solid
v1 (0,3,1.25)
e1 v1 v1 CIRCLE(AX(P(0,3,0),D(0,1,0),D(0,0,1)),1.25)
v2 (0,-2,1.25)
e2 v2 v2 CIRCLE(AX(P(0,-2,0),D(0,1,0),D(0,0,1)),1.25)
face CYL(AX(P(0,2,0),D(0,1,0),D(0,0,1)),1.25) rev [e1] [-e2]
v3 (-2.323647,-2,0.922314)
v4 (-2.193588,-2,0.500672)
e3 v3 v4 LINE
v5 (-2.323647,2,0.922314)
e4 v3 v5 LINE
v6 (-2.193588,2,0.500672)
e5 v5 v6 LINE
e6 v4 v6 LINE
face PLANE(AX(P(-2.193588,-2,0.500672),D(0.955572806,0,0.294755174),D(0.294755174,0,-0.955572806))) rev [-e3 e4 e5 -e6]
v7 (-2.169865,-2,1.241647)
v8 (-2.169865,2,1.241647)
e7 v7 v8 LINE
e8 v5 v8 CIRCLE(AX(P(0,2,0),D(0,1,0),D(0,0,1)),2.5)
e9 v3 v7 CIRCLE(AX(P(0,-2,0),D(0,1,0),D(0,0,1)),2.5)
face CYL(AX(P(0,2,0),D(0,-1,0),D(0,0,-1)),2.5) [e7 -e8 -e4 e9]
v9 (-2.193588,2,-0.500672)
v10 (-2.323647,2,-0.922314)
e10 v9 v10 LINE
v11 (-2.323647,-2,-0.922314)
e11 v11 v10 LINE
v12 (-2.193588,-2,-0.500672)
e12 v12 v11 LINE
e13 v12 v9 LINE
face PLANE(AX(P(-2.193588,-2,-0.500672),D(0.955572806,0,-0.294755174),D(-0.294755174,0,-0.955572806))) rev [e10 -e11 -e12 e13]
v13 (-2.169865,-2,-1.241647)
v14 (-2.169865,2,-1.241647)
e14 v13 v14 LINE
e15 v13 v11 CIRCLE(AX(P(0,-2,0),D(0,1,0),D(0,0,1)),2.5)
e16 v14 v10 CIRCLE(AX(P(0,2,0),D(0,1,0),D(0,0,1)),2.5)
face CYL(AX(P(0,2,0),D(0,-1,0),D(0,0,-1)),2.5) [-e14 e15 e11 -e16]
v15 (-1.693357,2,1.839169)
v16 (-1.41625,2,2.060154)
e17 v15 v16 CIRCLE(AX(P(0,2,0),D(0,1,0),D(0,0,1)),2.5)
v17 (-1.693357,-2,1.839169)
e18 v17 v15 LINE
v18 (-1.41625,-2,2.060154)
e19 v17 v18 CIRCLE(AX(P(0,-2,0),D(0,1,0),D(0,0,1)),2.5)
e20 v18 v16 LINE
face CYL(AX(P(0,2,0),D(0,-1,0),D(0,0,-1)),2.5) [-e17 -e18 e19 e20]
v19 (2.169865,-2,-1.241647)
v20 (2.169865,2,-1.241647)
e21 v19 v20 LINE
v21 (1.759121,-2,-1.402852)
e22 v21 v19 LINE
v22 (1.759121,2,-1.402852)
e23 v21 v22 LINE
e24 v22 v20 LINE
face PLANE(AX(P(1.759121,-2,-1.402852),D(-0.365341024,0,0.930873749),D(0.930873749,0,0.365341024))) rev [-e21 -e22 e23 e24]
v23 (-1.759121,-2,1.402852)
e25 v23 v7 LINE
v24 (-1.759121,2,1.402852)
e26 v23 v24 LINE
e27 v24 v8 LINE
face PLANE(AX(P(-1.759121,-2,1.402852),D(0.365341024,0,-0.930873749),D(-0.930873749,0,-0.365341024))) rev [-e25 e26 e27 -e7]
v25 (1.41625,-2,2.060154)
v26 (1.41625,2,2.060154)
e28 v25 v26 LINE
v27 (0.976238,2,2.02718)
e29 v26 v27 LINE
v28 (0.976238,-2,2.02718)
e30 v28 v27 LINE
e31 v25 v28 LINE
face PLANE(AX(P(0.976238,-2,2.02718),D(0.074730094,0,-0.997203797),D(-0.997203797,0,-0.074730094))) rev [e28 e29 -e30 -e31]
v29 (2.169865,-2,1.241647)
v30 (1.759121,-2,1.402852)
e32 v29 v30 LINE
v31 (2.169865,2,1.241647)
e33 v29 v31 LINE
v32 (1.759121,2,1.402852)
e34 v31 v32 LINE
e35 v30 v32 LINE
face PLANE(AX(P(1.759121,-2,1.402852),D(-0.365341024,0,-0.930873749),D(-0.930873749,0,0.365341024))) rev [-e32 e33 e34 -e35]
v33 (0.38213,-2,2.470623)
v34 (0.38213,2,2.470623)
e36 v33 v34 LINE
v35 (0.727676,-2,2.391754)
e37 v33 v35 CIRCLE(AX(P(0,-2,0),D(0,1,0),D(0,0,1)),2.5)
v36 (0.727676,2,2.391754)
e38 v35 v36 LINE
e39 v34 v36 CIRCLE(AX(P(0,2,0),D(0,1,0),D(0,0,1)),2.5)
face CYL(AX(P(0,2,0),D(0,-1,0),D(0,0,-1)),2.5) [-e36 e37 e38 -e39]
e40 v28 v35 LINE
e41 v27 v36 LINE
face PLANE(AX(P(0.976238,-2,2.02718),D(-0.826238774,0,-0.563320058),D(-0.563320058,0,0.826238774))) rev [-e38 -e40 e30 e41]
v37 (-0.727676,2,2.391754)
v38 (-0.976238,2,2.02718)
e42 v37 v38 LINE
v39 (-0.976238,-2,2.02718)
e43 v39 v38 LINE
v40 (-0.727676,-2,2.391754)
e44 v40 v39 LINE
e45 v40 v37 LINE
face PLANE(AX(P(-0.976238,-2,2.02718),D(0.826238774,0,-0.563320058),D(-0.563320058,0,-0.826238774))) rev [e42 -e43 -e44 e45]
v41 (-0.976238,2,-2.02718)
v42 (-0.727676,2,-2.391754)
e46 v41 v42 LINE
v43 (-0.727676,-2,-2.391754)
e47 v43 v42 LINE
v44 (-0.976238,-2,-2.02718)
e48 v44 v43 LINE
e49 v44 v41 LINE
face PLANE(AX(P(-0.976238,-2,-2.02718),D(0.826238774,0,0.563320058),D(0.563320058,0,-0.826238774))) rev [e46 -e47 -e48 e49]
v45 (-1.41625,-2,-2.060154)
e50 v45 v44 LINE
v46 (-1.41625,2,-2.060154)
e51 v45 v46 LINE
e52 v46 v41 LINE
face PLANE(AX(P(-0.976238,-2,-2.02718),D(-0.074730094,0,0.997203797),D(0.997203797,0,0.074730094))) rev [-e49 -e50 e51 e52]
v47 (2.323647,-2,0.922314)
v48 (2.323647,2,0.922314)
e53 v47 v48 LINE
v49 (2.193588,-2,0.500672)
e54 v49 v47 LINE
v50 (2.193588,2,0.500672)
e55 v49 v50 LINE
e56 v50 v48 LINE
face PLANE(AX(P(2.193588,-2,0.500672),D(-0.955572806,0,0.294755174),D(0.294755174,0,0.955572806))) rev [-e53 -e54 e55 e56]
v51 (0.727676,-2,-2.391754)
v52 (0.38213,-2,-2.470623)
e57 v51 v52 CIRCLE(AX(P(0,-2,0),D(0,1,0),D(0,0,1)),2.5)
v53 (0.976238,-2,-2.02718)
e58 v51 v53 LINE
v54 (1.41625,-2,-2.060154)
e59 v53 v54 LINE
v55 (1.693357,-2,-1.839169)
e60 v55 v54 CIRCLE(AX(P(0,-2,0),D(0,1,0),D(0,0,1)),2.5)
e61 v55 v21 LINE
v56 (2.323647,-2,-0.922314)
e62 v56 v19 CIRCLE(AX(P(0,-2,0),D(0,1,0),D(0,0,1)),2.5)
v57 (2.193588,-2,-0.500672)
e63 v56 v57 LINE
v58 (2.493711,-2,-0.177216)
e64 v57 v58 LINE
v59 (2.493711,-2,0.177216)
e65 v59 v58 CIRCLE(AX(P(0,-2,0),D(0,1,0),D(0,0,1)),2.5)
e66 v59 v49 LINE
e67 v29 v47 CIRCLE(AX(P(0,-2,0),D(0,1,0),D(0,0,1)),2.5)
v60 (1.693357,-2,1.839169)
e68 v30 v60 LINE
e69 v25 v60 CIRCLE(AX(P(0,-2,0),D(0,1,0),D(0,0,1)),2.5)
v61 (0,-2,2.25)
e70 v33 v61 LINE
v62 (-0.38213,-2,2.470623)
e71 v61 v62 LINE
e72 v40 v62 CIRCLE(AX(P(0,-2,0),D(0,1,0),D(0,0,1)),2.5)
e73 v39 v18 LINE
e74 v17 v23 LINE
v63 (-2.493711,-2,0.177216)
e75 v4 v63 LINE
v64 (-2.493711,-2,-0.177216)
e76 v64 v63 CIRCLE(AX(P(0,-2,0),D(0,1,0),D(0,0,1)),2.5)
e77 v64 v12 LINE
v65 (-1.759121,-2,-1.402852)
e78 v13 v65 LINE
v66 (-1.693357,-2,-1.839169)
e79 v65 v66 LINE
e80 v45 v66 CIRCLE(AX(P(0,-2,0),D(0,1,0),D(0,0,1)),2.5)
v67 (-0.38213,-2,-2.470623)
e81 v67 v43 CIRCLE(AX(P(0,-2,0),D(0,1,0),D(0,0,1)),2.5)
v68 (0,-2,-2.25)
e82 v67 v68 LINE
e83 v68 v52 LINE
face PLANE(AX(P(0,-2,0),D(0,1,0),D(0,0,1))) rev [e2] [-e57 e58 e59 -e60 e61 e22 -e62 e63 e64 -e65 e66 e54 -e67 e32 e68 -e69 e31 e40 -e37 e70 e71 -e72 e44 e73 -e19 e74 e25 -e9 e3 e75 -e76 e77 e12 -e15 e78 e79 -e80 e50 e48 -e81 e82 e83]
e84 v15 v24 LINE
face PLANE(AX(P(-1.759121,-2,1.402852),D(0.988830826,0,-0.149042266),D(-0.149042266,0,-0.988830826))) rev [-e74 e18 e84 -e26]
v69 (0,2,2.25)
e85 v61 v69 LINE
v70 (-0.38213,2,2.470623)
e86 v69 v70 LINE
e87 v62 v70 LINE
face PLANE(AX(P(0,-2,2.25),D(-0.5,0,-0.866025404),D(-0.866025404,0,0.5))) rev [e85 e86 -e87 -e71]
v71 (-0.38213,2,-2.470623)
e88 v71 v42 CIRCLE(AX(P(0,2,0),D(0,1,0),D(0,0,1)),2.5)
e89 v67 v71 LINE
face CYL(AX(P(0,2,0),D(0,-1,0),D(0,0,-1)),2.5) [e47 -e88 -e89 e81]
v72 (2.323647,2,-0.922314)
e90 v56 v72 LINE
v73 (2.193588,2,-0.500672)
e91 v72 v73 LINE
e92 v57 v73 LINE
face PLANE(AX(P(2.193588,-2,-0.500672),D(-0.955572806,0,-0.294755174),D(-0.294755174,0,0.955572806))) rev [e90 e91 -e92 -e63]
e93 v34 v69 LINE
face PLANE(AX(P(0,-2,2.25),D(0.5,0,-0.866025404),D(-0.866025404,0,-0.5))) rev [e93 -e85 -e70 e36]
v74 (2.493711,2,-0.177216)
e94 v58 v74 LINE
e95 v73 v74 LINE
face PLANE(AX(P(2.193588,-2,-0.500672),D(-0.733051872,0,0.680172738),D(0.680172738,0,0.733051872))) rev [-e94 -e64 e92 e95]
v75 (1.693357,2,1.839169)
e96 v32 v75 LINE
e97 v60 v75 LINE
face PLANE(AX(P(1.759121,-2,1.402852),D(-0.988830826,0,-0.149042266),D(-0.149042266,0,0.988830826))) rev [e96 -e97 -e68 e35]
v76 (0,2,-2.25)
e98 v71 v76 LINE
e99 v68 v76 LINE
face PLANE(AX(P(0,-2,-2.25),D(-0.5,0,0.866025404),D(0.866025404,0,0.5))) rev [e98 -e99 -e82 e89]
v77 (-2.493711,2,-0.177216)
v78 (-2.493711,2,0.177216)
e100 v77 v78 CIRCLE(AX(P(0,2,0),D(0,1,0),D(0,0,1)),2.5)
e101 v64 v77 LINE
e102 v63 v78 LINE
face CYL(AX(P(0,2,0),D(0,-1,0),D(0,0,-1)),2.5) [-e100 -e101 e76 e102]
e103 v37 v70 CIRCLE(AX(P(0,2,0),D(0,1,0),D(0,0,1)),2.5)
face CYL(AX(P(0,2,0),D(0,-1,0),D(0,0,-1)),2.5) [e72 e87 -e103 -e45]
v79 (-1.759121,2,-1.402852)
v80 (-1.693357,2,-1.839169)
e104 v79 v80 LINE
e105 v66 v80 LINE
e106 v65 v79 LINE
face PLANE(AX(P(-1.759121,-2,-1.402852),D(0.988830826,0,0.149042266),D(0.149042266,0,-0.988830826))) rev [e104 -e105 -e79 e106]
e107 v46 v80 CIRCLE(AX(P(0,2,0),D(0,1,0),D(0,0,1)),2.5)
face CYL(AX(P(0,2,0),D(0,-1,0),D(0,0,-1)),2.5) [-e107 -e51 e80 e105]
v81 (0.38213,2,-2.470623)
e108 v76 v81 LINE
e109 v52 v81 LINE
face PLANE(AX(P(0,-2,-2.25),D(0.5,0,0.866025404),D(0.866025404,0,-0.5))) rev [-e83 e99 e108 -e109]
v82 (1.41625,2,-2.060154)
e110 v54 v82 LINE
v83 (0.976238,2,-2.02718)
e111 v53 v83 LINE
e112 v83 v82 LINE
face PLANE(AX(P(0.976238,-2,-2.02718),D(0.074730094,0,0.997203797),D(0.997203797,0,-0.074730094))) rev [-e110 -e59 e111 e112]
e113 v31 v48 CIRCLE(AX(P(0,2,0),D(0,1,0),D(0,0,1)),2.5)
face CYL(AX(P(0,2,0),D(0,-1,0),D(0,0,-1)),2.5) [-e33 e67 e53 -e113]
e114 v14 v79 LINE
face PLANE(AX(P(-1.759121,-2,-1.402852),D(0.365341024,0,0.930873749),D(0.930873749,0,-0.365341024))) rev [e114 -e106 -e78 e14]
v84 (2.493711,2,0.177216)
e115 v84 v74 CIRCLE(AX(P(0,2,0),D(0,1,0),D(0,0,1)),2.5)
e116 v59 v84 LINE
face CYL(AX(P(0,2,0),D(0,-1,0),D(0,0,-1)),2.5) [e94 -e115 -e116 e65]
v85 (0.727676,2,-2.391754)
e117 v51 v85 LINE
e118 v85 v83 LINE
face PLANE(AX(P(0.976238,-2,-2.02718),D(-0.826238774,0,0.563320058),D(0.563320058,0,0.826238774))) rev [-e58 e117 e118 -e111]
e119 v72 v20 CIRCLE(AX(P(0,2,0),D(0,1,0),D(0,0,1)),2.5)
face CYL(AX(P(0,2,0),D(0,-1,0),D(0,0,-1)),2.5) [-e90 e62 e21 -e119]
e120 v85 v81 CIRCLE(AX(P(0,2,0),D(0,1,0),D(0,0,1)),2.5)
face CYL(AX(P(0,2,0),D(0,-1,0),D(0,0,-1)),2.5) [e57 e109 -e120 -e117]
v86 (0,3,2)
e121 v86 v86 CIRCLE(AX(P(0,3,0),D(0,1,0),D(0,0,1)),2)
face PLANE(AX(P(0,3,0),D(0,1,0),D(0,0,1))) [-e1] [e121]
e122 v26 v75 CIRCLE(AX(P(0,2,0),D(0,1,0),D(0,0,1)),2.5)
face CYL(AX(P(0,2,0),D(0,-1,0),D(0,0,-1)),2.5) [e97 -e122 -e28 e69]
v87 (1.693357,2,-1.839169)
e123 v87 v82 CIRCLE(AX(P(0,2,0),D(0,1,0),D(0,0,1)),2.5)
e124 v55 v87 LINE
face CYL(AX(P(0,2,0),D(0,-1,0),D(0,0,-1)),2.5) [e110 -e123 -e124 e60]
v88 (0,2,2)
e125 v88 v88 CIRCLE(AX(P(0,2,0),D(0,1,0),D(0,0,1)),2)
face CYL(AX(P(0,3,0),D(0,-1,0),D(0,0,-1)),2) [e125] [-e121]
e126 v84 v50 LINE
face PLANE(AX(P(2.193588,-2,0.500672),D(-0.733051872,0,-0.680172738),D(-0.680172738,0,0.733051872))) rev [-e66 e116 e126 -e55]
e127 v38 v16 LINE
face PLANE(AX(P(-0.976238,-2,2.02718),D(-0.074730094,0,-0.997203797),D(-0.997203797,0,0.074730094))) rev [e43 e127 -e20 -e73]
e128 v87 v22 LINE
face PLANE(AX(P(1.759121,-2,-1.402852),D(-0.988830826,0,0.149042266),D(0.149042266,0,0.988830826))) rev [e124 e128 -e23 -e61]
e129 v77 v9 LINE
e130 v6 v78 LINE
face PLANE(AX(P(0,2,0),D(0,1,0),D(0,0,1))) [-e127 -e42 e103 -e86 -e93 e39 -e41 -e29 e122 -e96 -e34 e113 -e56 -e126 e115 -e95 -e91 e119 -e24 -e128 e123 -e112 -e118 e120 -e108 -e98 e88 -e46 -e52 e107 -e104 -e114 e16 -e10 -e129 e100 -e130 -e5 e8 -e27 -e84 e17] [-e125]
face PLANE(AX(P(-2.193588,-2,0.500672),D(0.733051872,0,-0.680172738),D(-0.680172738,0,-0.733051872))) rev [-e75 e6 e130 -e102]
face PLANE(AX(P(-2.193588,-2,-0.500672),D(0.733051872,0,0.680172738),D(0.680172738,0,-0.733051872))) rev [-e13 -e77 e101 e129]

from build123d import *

# Parameters (mm, degrees)
MAINBODYS_R           = 2.5
MAIN_BODY_DEPTH       = 2
M3X0_5_TAPPED_HOLE1_D = 2.5
GROOVED_CUT_DEPTH     = 6.338539126
GC_START              = -2
GC_CP_DEPTH           = 4
PRESSFITBODYS_R       = 2
PRESSFITBODYS_R_2     = 1.25
PRESS_FIT_BODY_DEPTH  = 1


# Read off the part's stored shape, not the designer's step: GC CP
with BuildPart() as part:
    # MainBodyS → MAIN BODY (new, symmetric)
    with BuildSketch(Plane(origin=(0, 0, 0), x_dir=(1, 0, 0), z_dir=(0, 1, 0))):
        with Locations(Location((0, 0, 0), (0, 0, 270))):
            Circle(MAINBODYS_R)
    extrude(amount=MAIN_BODY_DEPTH, both=True)

    # M3x0.5 Tapped Hole1 (through all)
    with Locations(Plane(origin=(0, 2, 0), x_dir=(1, 0, 0), z_dir=(0, 1, 0))):
        with Locations((0, 0)):
            Hole(M3X0_5_TAPPED_HOLE1_D / 2)

    # GroovedCutS → GROOVED CUT (cut, through all)
    with BuildSketch(Plane(origin=(0, 2, 0), x_dir=(1, 0, 0), z_dir=(0, 1, 0))):
        with BuildLine():
            Line((0, 2.25), (0.382129822, 2.470622755))
            ThreePointArc((0.382129822, 2.470622755), (0, 2.5), (-0.382129822, 2.470622755))
            Line((-0.382129822, 2.470622755), (0, 2.25))
        make_face()
    extrude(amount=-GROOVED_CUT_DEPTH, mode=Mode.SUBTRACT)

    # GC CP outline → GC CP (cut)
    with BuildSketch(Plane(origin=(0, 0, 0), x_dir=(1, 0, 0), z_dir=(0, 1, 0)).offset(GC_START)):
        with BuildLine():
            ThreePointArc((-0.727675966, 2.391754103), (-1.084709348, 2.25242217), (-1.416250112, 2.060154271))
            Line((-1.416250112, 2.060154271), (-0.976238413, 2.027179953))
            Line((-0.976238413, 2.027179953), (-0.727675966, 2.391754103))
        make_face()
        with BuildLine():
            Line((0.976238413, 2.027179953), (1.416250112, 2.060154271))
            ThreePointArc((1.416250112, 2.060154271), (1.084709348, 2.25242217), (0.727675966, 2.391754103))
            Line((0.727675966, 2.391754103), (0.976238413, 2.027179953))
        make_face()
        with BuildLine():
            Line((1.759120836, 1.402852054), (2.169864698, 1.241646967))
            ThreePointArc((2.169864698, 1.241646967), (1.954578706, 1.558724504), (1.693356605, 1.839169217))
            Line((1.693356605, 1.839169217), (1.759120836, 1.402852054))
        make_face()
        with BuildLine():
            Line((2.193587802, 0.500672101), (2.493710969, 0.177216254))
            ThreePointArc((2.493710969, 0.177216254), (2.43731978, 0.556302335), (2.3236472, 0.922314312))
            Line((2.3236472, 0.922314312), (2.193587802, 0.500672101))
        make_face()
        with BuildLine():
            Line((2.193587802, -0.500672101), (2.3236472, -0.922314312))
            ThreePointArc((2.3236472, -0.922314312), (2.43731978, -0.556302335), (2.493710969, -0.177216254))
            Line((2.493710969, -0.177216254), (2.193587802, -0.500672101))
        make_face()
        with BuildLine():
            Line((1.759120836, -1.402852054), (1.693356605, -1.839169217))
            ThreePointArc((1.693356605, -1.839169217), (1.954578706, -1.558724504), (2.169864698, -1.241646967))
            Line((2.169864698, -1.241646967), (1.759120836, -1.402852054))
        make_face()
        with BuildLine():
            Line((0.976238413, -2.027179953), (0.727675966, -2.391754103))
            ThreePointArc((0.727675966, -2.391754103), (1.084709348, -2.25242217), (1.416250112, -2.060154271))
            Line((1.416250112, -2.060154271), (0.976238413, -2.027179953))
        make_face()
        with BuildLine():
            Line((0, -2.25), (-0.382129822, -2.470622755))
            ThreePointArc((-0.382129822, -2.470622755), (0, -2.5), (0.382129822, -2.470622755))
            Line((0.382129822, -2.470622755), (0, -2.25))
        make_face()
        with BuildLine():
            Line((-0.976238413, -2.027179953), (-1.416250112, -2.060154271))
            ThreePointArc((-1.416250112, -2.060154271), (-1.084709348, -2.25242217), (-0.727675966, -2.391754103))
            Line((-0.727675966, -2.391754103), (-0.976238413, -2.027179953))
        make_face()
        with BuildLine():
            Line((-1.759120836, -1.402852054), (-2.169864698, -1.241646967))
            ThreePointArc((-2.169864698, -1.241646967), (-1.954578706, -1.558724504), (-1.693356605, -1.839169217))
            Line((-1.693356605, -1.839169217), (-1.759120836, -1.402852054))
        make_face()
        with BuildLine():
            Line((-2.193587802, -0.500672101), (-2.493710969, -0.177216254))
            ThreePointArc((-2.493710969, -0.177216254), (-2.43731978, -0.556302335), (-2.3236472, -0.922314312))
            Line((-2.3236472, -0.922314312), (-2.193587802, -0.500672101))
        make_face()
        with BuildLine():
            Line((-2.193587802, 0.500672101), (-2.3236472, 0.922314312))
            ThreePointArc((-2.3236472, 0.922314312), (-2.43731978, 0.556302335), (-2.493710969, 0.177216254))
            Line((-2.493710969, 0.177216254), (-2.193587802, 0.500672101))
        make_face()
        with BuildLine():
            Line((-1.759120836, 1.402852054), (-1.693356605, 1.839169217))
            ThreePointArc((-1.693356605, 1.839169217), (-1.954578706, 1.558724504), (-2.169864698, 1.241646967))
            Line((-2.169864698, 1.241646967), (-1.759120836, 1.402852054))
        make_face()
    extrude(amount=GC_CP_DEPTH, mode=Mode.SUBTRACT)

    # PressFitBodyS → PRESS FIT BODY (add)
    with BuildSketch(Plane(origin=(0, 2, 0), x_dir=(1, 0, 0), z_dir=(0, 1, 0))):
        with Locations(Location((0, 0, 0), (0, 0, 270))):
            Circle(PRESSFITBODYS_R)
        with Locations(Location((0, 0, 0), (0, 0, 270))):
            Circle(PRESSFITBODYS_R_2, mode=Mode.SUBTRACT)
    extrude(amount=PRESS_FIT_BODY_DEPTH)


solid = part.part
